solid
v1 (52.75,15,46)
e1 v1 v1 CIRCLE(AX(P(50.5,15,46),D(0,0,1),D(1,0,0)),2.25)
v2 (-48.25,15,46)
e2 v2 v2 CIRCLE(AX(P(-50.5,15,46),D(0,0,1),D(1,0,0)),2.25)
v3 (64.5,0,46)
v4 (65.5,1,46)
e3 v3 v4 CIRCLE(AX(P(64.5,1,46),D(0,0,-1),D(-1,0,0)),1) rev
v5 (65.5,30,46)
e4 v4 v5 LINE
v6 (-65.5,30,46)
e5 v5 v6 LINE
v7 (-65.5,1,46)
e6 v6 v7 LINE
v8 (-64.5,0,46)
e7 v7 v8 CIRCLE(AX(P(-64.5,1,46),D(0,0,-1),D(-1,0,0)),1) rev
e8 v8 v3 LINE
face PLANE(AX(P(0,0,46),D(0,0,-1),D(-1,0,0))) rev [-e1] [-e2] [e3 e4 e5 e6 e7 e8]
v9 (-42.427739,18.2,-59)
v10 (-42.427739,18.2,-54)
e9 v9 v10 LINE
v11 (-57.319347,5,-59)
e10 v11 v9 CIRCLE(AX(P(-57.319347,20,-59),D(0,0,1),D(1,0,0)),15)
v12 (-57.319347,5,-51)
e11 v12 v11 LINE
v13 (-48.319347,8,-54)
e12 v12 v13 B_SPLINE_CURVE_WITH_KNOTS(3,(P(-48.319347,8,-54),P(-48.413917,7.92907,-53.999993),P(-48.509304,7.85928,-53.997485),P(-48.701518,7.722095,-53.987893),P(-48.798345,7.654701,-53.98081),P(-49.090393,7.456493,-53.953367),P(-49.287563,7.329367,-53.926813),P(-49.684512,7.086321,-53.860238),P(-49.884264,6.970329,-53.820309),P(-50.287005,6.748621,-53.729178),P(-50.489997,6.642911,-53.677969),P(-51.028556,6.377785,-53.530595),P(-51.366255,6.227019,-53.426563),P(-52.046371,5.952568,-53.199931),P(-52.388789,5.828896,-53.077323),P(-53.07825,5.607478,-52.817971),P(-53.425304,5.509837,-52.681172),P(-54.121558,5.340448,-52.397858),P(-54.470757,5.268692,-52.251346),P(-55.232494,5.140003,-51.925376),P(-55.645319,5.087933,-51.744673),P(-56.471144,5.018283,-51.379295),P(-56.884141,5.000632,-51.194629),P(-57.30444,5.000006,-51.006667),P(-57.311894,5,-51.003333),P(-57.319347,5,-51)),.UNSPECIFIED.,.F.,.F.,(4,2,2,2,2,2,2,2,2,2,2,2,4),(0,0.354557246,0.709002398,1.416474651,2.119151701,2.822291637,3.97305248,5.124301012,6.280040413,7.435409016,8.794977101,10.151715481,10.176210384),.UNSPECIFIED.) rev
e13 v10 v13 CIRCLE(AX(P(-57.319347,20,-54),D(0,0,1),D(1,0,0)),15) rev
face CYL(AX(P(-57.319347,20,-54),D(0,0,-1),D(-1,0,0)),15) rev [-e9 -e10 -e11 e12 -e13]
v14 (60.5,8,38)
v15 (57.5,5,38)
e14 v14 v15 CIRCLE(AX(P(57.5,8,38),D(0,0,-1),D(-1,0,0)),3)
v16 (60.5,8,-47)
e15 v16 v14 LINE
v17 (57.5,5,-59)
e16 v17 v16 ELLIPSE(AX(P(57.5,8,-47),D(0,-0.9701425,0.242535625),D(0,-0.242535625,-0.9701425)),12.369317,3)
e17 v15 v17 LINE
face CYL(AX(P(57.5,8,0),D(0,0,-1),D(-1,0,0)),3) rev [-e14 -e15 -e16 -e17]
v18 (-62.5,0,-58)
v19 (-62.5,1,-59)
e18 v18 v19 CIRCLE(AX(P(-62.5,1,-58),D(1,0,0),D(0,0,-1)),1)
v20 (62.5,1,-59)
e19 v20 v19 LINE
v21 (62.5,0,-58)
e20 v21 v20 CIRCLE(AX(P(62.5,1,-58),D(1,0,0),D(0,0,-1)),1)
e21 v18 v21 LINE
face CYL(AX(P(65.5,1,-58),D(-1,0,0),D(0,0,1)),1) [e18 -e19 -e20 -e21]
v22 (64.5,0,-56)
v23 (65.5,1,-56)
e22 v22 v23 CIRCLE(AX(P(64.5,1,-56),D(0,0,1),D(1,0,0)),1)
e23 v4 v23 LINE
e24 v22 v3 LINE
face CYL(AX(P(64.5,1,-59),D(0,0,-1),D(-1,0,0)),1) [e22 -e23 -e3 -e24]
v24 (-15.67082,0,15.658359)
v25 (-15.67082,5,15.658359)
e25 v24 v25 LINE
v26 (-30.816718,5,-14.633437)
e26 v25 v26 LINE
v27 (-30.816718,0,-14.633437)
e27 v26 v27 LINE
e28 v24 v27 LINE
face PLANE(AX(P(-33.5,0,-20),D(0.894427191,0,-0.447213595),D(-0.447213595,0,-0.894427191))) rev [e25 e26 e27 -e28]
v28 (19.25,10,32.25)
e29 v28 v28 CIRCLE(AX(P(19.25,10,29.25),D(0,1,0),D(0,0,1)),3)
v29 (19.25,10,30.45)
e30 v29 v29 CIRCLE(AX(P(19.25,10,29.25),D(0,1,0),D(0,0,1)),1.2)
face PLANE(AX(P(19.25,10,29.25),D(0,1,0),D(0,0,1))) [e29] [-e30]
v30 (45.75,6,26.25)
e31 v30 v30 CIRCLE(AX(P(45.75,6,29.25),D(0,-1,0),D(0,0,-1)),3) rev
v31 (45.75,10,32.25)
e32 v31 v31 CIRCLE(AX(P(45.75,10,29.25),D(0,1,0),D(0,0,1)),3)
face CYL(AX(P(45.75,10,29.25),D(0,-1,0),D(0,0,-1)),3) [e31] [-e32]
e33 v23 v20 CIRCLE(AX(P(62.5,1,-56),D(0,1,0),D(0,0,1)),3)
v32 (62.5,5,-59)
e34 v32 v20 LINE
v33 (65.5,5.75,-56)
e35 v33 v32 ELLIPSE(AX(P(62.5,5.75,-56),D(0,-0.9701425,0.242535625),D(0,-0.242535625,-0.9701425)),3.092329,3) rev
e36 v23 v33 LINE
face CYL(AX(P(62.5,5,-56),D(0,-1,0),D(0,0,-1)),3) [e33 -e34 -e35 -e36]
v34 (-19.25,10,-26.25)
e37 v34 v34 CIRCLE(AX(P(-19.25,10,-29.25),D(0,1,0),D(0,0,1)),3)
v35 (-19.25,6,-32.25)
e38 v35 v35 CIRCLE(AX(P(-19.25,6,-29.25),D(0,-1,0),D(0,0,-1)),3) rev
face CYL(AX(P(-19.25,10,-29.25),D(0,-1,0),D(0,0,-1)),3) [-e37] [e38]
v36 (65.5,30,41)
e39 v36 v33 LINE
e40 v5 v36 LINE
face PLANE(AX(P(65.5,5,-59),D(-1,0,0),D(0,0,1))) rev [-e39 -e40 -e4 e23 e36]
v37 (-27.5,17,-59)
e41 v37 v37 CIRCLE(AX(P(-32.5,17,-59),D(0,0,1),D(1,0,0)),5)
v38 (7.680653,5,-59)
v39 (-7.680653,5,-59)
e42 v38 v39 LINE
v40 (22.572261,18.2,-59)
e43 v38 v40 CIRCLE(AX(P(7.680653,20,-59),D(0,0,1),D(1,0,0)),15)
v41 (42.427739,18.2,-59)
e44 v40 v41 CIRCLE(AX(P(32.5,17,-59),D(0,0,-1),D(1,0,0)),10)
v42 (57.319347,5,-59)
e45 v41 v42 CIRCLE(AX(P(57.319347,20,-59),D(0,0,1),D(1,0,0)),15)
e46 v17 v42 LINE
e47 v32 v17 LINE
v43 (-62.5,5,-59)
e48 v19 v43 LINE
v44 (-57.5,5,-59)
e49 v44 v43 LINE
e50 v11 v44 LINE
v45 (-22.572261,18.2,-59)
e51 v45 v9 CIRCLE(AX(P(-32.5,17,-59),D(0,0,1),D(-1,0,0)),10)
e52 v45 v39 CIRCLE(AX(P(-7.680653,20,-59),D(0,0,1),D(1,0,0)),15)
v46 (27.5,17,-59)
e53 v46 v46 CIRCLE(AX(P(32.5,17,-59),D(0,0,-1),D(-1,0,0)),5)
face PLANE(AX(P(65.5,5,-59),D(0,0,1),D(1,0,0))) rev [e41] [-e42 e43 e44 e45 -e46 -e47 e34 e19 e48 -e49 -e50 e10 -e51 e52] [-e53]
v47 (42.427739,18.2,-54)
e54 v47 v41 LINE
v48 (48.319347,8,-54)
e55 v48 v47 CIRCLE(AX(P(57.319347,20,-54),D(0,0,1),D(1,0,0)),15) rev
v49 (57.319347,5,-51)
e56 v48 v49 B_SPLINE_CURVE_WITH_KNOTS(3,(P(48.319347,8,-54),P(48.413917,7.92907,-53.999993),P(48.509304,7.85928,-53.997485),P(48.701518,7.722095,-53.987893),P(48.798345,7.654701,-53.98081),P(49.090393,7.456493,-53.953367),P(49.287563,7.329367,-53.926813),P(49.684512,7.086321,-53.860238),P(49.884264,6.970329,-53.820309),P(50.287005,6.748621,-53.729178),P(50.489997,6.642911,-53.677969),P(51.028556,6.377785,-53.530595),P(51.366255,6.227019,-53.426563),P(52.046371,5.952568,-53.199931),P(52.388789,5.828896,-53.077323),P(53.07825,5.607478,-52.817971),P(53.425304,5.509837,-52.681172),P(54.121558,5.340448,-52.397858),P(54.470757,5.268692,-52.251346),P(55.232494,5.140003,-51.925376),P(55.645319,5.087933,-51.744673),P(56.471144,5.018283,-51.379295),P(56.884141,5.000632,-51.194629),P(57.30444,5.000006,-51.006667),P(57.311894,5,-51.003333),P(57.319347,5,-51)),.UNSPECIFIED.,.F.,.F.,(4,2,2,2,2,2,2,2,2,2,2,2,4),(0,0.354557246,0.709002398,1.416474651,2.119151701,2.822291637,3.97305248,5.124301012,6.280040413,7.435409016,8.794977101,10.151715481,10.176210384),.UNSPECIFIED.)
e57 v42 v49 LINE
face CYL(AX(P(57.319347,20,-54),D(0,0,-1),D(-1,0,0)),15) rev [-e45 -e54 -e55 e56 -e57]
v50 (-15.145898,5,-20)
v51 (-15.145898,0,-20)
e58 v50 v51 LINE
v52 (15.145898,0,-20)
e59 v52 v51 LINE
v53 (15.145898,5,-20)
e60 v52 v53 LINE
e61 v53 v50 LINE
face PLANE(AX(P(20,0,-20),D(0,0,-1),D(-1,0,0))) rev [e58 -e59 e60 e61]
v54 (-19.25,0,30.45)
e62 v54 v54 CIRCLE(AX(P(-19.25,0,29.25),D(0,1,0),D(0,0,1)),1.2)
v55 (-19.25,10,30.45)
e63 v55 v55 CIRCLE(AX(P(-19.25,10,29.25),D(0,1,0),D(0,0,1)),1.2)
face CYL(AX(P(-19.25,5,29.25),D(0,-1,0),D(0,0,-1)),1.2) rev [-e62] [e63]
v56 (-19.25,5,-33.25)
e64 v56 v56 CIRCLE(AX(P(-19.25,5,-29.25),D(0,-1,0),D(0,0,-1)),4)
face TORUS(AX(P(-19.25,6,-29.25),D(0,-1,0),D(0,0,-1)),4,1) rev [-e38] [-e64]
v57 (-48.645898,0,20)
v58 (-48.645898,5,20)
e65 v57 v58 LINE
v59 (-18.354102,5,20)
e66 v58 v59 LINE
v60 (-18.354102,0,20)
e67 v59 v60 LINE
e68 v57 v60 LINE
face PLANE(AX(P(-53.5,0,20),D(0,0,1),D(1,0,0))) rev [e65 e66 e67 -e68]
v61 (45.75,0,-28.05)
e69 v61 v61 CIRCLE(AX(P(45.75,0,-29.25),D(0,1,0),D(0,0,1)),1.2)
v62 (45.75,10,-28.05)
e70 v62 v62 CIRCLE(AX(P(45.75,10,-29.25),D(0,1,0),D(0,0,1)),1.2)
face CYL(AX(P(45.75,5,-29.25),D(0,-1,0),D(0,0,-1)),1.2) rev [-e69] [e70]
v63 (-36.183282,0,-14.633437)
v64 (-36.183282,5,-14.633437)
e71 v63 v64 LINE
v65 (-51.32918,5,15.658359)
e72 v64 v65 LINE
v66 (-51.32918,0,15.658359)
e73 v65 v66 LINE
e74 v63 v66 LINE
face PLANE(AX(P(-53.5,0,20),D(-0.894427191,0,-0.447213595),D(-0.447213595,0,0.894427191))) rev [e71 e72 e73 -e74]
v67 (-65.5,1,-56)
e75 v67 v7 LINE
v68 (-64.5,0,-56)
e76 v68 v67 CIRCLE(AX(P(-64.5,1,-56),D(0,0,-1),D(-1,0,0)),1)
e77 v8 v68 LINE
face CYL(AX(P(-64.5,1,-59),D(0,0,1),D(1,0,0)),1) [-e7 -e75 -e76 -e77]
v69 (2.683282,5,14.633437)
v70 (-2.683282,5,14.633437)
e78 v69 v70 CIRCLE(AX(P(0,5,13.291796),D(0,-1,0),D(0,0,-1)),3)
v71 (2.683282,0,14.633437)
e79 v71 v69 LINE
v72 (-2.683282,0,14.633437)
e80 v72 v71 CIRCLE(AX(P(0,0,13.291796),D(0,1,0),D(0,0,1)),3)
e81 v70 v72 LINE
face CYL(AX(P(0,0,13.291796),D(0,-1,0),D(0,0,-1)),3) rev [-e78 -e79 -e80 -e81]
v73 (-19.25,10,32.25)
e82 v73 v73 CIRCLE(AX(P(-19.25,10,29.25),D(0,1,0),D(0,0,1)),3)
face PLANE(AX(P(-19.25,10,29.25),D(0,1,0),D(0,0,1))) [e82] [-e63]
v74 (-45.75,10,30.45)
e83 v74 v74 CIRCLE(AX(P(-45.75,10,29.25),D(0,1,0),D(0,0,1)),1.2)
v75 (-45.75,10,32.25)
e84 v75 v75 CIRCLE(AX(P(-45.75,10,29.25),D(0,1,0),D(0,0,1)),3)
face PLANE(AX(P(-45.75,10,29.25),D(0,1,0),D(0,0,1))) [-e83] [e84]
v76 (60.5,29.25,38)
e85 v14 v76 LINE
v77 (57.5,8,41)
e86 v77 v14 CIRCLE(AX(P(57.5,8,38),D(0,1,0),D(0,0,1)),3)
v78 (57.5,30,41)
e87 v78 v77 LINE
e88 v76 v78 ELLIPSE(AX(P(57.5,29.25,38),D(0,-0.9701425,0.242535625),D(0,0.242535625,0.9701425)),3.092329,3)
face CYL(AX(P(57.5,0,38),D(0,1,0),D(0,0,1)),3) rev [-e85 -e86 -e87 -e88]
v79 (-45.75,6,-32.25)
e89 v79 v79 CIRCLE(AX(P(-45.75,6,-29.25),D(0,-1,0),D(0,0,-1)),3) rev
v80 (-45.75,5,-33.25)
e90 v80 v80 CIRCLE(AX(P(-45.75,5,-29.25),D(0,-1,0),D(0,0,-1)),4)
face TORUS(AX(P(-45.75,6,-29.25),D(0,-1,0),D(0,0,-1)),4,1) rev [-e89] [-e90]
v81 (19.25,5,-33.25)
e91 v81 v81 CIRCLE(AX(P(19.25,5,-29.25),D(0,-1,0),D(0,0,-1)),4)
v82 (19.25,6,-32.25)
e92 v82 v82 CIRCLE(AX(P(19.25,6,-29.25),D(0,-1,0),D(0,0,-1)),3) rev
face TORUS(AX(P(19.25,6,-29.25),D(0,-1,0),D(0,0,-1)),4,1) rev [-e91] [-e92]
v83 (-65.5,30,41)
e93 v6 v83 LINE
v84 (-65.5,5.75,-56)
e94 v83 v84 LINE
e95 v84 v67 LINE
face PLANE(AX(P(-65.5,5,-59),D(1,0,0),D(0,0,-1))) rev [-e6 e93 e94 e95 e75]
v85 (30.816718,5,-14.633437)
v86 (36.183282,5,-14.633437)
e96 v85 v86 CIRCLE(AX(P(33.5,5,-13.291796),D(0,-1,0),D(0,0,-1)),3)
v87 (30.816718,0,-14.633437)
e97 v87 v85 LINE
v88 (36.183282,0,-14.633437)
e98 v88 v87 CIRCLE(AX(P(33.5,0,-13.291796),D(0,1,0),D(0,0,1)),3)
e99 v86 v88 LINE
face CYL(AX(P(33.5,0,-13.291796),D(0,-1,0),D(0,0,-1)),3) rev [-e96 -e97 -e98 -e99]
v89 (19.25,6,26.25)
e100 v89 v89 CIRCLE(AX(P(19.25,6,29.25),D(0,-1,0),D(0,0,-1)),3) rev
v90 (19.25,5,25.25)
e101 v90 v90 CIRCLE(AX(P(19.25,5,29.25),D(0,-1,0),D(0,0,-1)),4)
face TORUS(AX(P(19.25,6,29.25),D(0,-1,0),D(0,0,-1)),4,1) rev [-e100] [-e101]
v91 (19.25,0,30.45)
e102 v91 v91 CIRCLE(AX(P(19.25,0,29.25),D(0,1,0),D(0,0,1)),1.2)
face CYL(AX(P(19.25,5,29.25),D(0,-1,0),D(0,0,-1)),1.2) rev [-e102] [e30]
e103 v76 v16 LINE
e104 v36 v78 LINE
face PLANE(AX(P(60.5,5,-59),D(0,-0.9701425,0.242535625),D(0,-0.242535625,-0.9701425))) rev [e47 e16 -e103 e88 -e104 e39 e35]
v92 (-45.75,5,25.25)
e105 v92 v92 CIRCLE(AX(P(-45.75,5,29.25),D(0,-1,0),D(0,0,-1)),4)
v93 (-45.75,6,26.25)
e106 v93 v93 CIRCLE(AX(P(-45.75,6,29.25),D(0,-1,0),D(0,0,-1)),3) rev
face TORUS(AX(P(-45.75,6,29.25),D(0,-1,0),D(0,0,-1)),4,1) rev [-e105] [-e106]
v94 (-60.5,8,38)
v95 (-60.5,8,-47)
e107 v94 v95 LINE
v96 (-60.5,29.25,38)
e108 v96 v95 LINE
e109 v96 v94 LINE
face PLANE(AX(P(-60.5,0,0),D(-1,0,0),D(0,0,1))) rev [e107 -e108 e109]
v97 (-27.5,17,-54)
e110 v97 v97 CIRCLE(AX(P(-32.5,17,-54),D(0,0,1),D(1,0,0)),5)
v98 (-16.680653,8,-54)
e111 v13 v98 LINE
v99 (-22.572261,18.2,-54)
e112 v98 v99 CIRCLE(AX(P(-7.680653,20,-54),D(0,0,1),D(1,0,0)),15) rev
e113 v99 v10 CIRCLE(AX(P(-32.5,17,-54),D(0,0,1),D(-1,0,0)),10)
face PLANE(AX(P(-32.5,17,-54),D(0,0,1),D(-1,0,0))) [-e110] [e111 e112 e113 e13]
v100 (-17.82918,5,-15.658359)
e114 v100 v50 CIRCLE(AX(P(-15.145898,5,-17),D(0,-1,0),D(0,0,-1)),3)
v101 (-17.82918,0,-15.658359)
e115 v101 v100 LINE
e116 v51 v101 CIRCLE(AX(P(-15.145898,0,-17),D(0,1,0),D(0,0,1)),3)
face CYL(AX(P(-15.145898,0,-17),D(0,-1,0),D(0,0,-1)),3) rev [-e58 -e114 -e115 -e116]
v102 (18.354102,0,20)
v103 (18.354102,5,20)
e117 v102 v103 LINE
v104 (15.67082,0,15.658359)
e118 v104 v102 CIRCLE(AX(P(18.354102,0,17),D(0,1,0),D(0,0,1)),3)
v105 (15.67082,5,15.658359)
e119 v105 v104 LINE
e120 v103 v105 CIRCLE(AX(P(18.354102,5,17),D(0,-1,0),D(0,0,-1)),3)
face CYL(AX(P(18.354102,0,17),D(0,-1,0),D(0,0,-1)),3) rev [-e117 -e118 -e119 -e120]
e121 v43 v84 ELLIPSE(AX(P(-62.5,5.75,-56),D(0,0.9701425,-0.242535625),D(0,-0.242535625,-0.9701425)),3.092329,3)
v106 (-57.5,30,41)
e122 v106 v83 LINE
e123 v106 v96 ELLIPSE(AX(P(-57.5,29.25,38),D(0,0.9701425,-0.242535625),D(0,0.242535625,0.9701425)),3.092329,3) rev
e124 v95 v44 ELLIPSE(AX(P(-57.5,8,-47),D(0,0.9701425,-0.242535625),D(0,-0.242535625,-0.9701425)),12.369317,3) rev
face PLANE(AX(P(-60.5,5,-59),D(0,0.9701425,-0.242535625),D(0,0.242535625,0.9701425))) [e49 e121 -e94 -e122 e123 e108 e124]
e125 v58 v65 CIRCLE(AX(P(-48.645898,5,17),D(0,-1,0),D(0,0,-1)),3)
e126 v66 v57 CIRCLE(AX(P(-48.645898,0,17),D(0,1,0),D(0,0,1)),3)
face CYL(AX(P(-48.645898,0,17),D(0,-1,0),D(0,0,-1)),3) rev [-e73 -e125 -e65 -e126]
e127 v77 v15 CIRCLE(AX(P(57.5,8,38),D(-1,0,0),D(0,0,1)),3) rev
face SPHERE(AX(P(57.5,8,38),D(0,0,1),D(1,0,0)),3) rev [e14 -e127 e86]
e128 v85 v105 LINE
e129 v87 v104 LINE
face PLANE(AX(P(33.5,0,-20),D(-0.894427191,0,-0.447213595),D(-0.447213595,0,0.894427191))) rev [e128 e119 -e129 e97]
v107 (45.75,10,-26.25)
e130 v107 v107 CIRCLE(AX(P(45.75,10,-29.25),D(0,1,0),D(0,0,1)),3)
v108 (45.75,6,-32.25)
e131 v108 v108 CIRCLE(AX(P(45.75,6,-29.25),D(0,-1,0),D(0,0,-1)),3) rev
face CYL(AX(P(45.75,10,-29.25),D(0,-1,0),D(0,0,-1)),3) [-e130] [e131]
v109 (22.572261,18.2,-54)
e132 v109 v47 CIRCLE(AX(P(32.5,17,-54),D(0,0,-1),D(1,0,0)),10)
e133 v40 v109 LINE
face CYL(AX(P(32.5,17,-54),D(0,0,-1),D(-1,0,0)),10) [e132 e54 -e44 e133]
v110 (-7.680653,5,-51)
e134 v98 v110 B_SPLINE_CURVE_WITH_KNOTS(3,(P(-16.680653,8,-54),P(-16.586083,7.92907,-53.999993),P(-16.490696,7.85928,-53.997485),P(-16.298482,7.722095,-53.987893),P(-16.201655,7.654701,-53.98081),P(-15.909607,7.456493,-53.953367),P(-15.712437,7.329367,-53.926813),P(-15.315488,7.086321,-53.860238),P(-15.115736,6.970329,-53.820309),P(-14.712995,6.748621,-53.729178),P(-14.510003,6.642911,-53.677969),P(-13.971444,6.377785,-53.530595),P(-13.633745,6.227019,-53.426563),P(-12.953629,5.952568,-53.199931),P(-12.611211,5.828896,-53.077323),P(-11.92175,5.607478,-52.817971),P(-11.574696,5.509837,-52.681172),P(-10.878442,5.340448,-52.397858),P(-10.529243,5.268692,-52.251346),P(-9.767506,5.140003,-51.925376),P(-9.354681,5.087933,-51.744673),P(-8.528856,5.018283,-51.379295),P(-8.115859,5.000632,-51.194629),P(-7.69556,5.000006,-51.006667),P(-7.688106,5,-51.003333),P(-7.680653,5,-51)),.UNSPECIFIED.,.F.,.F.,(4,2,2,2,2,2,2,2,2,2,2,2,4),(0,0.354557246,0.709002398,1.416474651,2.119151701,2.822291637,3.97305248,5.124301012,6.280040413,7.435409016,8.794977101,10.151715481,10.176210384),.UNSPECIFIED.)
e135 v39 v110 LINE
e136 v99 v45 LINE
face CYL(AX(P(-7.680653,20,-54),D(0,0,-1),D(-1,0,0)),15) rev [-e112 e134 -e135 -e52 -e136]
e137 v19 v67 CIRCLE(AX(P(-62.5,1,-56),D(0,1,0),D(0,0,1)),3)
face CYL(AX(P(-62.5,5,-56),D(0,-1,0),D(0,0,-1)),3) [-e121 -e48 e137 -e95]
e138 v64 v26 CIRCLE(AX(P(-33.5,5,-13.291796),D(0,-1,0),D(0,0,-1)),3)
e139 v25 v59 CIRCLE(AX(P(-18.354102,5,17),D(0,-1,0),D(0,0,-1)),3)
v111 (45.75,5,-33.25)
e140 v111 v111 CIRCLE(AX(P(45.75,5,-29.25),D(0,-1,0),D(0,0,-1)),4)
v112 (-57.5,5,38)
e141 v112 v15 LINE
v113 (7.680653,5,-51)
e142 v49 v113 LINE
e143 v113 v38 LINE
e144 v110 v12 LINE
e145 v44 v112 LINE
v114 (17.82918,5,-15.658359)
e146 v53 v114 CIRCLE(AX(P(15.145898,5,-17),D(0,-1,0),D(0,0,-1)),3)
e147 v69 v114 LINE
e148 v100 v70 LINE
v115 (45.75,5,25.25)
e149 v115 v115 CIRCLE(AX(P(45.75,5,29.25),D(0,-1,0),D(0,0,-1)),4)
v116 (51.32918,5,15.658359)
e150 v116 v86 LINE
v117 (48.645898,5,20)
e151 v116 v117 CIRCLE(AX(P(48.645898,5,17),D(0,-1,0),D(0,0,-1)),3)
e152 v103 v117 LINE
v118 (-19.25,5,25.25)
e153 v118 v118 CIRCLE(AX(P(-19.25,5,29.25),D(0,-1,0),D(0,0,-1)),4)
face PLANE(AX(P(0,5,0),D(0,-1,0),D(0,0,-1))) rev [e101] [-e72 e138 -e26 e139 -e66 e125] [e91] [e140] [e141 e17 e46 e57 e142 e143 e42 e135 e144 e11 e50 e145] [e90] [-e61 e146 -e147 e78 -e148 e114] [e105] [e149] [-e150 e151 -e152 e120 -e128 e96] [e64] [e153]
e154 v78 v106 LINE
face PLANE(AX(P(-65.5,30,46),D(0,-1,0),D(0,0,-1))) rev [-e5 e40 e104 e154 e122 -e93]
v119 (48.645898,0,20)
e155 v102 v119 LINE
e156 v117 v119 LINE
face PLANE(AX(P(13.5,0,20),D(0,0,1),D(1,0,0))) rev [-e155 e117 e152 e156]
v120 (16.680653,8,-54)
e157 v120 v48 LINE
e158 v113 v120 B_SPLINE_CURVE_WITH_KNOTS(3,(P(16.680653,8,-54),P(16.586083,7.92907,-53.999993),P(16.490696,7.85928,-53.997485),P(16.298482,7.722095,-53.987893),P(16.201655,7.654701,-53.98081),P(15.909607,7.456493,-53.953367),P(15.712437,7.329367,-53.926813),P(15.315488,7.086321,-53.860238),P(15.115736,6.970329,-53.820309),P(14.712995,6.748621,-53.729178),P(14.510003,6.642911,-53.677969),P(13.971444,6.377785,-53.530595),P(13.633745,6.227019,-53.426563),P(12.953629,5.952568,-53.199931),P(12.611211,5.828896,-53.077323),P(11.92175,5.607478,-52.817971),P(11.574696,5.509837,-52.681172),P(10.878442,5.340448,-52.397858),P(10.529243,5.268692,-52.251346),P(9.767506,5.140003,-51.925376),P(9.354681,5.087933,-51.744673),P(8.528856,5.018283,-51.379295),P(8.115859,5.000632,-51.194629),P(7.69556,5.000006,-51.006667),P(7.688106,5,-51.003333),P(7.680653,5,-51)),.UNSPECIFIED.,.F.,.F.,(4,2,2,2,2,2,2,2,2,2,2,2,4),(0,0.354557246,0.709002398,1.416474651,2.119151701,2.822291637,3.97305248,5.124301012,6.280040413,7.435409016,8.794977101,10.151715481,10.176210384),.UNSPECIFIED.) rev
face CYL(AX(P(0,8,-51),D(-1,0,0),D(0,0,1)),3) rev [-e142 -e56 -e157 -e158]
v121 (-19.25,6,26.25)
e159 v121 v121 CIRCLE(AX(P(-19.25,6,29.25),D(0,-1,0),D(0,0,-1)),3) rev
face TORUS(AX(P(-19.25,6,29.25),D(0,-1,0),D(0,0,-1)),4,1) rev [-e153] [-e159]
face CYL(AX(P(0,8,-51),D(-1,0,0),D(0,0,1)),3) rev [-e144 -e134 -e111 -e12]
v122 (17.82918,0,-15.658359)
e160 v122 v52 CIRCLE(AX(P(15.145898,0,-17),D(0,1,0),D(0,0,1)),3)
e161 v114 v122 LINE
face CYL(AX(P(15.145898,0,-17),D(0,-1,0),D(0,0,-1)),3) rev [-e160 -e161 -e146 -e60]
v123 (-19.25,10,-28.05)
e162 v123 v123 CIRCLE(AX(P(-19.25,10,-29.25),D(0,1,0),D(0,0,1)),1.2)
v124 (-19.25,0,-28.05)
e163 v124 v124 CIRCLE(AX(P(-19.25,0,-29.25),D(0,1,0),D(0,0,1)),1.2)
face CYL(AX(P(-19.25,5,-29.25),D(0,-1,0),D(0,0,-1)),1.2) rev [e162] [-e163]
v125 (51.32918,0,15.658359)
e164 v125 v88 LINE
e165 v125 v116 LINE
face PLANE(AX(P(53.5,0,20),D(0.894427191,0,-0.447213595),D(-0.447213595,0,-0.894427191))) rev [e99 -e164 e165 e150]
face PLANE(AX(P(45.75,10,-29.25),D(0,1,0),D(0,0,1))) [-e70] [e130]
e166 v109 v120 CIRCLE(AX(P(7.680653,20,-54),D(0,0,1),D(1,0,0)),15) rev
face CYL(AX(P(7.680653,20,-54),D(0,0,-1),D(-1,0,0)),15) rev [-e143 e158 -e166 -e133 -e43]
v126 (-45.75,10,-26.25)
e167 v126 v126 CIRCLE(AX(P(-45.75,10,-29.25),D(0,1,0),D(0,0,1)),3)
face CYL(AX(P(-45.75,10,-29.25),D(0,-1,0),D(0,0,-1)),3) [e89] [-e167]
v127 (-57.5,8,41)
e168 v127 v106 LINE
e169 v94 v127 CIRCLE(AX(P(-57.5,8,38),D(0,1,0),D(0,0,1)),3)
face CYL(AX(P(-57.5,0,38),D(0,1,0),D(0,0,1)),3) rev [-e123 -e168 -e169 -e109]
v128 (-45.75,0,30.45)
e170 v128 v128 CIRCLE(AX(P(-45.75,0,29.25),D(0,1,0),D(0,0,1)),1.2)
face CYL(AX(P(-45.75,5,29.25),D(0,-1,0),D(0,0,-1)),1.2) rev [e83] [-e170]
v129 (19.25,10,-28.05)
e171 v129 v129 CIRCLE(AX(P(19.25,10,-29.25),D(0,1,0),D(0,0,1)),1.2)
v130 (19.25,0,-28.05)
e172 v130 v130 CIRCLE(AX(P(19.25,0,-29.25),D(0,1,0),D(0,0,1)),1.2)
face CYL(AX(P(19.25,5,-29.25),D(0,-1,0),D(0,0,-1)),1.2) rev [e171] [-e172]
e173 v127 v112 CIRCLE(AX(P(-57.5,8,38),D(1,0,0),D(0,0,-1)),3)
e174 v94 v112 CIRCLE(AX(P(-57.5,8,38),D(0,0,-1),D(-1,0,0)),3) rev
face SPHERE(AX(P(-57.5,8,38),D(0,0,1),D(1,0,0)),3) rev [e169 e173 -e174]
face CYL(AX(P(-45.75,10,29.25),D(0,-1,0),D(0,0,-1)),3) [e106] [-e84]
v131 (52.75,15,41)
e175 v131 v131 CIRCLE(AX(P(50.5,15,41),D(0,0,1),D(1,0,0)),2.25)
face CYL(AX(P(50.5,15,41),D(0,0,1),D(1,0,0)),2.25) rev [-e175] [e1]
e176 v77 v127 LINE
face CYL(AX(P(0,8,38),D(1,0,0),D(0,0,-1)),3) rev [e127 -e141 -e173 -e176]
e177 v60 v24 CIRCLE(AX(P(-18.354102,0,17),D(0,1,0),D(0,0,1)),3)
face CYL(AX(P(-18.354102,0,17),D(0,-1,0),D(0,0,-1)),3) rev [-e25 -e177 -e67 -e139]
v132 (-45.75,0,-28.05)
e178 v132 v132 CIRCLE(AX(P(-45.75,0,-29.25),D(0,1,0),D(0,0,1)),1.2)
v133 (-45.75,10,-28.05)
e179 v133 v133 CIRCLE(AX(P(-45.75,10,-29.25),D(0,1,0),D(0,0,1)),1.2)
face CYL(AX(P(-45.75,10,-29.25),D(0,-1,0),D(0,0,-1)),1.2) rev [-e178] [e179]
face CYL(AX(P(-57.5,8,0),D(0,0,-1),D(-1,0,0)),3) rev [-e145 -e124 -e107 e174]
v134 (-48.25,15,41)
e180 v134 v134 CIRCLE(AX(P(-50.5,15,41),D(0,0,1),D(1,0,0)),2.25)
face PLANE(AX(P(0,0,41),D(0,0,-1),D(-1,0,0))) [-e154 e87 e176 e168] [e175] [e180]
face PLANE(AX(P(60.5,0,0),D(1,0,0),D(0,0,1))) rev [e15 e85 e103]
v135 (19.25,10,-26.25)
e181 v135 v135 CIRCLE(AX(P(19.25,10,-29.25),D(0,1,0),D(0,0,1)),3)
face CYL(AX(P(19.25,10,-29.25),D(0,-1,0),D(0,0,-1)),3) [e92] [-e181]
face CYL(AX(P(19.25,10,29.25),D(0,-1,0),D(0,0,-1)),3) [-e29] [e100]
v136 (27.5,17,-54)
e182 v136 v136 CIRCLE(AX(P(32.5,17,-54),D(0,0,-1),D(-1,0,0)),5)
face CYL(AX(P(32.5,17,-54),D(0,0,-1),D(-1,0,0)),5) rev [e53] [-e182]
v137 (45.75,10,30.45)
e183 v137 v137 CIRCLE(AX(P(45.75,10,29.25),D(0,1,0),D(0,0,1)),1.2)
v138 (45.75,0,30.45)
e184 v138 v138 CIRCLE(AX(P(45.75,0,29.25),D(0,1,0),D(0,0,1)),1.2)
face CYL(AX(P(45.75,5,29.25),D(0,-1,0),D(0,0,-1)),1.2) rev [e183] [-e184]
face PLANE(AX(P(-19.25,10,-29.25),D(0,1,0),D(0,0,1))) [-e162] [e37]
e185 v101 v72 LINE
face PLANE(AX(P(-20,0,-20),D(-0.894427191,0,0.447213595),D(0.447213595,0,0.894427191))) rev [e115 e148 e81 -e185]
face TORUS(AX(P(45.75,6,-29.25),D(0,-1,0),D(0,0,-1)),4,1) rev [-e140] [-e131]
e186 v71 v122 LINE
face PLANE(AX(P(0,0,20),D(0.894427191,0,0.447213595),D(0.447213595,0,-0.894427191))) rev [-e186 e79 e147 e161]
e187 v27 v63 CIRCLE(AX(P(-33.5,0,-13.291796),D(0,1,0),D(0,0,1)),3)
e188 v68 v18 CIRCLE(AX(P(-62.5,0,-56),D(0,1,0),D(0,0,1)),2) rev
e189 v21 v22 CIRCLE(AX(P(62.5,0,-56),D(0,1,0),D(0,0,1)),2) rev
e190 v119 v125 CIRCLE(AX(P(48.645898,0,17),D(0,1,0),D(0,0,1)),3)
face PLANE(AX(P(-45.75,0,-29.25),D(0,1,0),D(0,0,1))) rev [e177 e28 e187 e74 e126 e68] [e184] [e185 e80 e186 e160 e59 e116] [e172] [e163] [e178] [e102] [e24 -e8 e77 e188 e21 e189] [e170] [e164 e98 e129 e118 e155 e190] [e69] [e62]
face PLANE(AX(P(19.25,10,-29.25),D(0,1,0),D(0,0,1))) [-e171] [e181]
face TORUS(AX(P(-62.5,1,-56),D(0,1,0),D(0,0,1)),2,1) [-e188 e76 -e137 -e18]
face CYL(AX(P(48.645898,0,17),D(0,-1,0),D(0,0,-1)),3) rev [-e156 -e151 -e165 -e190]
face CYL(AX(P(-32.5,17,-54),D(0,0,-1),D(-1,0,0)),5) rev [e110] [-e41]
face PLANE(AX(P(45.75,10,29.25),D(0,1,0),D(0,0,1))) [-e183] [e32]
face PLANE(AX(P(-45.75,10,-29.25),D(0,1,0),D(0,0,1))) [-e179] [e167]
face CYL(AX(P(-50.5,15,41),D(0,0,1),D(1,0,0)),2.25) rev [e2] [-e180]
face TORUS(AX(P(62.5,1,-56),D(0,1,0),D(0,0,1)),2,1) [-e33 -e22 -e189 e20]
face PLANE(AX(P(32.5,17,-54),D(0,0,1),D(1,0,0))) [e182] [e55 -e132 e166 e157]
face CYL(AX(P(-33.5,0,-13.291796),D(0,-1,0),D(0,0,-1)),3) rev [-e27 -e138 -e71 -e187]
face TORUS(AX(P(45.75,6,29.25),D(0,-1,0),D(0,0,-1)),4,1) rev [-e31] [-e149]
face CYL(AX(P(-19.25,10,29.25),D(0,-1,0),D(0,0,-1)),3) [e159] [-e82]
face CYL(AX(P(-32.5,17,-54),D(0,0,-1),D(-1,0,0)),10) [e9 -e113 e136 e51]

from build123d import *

# Parameters (mm, degrees)
SKETCH1_R             = 3
SKETCH1_R_2           = 1.2
BOSS_EXTRUDE1_DEPTH   = 10
BOSS_EXTRUDE1_2_DEPTH = 10
BOSS_EXTRUDE1_3_DEPTH = 10
BOSS_EXTRUDE1_4_DEPTH = 10
BOSS_EXTRUDE1_5_DEPTH = 10
BOSS_EXTRUDE1_6_DEPTH = 10
BOSS_EXTRUDE1_7_DEPTH = 10
BOSS_EXTRUDE1_8_DEPTH = 10
SKETCH2_W             = 131
SKETCH2_H             = 100
SKETCH2_R             = 1.2
BOSS_EXTRUDE2_DEPTH   = 5
SKETCH5_W             = 131
SKETCH5_H             = 30
BOSS_EXTRUDE4_DEPTH   = 5
BOSS_EXTRUDE5_DEPTH   = 5
FILLET2_R             = 3
SKETCH7_R             = 2.25
CUT_EXTRUDE2_DEPTH    = 5
SKETCH8_R             = 5
BOSS_EXTRUDE6_DEPTH   = 5
FILLET5_R             = 15
FILLET6_R             = 3
FILLET5_OF_MIRROR2_R  = 15
FILLET6_OF_MIRROR2_R  = 3
FILLET7_R             = 1
FILLET8_R             = 1
CUT_EXTRUDE3_DEPTH    = 5
FILLET9_R             = 3


with BuildPart() as part:
    # Sketch1 → Boss-Extrude1 (new body)
    with BuildSketch(Plane(origin=(0, 0, 0), x_dir=(1, 0, 0), z_dir=(0, 1, 0))):
        with Locations(Location((-45.75, 29.25, 0), (0, 0, 270))):
            Circle(SKETCH1_R)
        with Locations(Location((-45.75, 29.25, 0), (0, 0, 270))):
            Circle(SKETCH1_R_2, mode=Mode.SUBTRACT)
    extrude(amount=BOSS_EXTRUDE1_DEPTH)



with BuildPart() as body_2:
    # Sketch1 → Boss-Extrude1 2 (new body)
    with BuildSketch(Plane(origin=(0, 0, 0), x_dir=(1, 0, 0), z_dir=(0, 1, 0))):
        with Locations(Location((-19.25, 29.25, 0), (0, 0, 270))):
            Circle(SKETCH1_R)
        with Locations(Location((-19.25, 29.25, 0), (0, 0, 270))):
            Circle(SKETCH1_R_2, mode=Mode.SUBTRACT)
    extrude(amount=BOSS_EXTRUDE1_2_DEPTH)


with BuildPart() as body_3:
    # Sketch1 → Boss-Extrude1 3 (new body)
    with BuildSketch(Plane(origin=(0, 0, 0), x_dir=(1, 0, 0), z_dir=(0, 1, 0))):
        with Locations(Location((-45.75, -29.25, 0), (0, 0, 270))):
            Circle(SKETCH1_R)
        with Locations(Location((-45.75, -29.25, 0), (0, 0, 270))):
            Circle(SKETCH1_R_2, mode=Mode.SUBTRACT)
    extrude(amount=BOSS_EXTRUDE1_3_DEPTH)


with BuildPart() as body_4:
    # Sketch1 → Boss-Extrude1 4 (new body)
    with BuildSketch(Plane(origin=(0, 0, 0), x_dir=(1, 0, 0), z_dir=(0, 1, 0))):
        with Locations(Location((-19.25, -29.25, 0), (0, 0, 270))):
            Circle(SKETCH1_R)
        with Locations(Location((-19.25, -29.25, 0), (0, 0, 270))):
            Circle(SKETCH1_R_2, mode=Mode.SUBTRACT)
    extrude(amount=BOSS_EXTRUDE1_4_DEPTH)


with BuildPart() as body_5:
    # Sketch1 → Boss-Extrude1 5 (new body)
    with BuildSketch(Plane(origin=(0, 0, 0), x_dir=(1, 0, 0), z_dir=(0, 1, 0))):
        with Locations(Location((19.25, 29.25, 0), (0, 0, 270))):
            Circle(SKETCH1_R)
        with Locations(Location((19.25, 29.25, 0), (0, 0, 270))):
            Circle(SKETCH1_R_2, mode=Mode.SUBTRACT)
    extrude(amount=BOSS_EXTRUDE1_5_DEPTH)


with BuildPart() as body_6:
    # Sketch1 → Boss-Extrude1 6 (new body)
    with BuildSketch(Plane(origin=(0, 0, 0), x_dir=(1, 0, 0), z_dir=(0, 1, 0))):
        with Locations(Location((45.75, 29.25, 0), (0, 0, 270))):
            Circle(SKETCH1_R)
        with Locations(Location((45.75, 29.25, 0), (0, 0, 270))):
            Circle(SKETCH1_R_2, mode=Mode.SUBTRACT)
    extrude(amount=BOSS_EXTRUDE1_6_DEPTH)


with BuildPart() as body_7:
    # Sketch1 → Boss-Extrude1 7 (new body)
    with BuildSketch(Plane(origin=(0, 0, 0), x_dir=(1, 0, 0), z_dir=(0, 1, 0))):
        with Locations(Location((45.75, -29.25, 0), (0, 0, 270))):
            Circle(SKETCH1_R)
        with Locations(Location((45.75, -29.25, 0), (0, 0, 270))):
            Circle(SKETCH1_R_2, mode=Mode.SUBTRACT)
    extrude(amount=BOSS_EXTRUDE1_7_DEPTH)


with BuildPart() as body_8:
    # Sketch1 → Boss-Extrude1 8 (new body)
    with BuildSketch(Plane(origin=(0, 0, 0), x_dir=(1, 0, 0), z_dir=(0, 1, 0))):
        with Locations(Location((19.25, -29.25, 0), (0, 0, 270))):
            Circle(SKETCH1_R)
        with Locations(Location((19.25, -29.25, 0), (0, 0, 270))):
            Circle(SKETCH1_R_2, mode=Mode.SUBTRACT)
    extrude(amount=BOSS_EXTRUDE1_8_DEPTH)


with BuildPart() as part_1:
    add(part.part)

    add(body_2.part)  # Boss-Extrude2 merges body 2

    add(body_3.part)  # Boss-Extrude2 merges body 3

    add(body_4.part)  # Boss-Extrude2 merges body 4

    add(body_5.part)  # Boss-Extrude2 merges body 5

    add(body_6.part)  # Boss-Extrude2 merges body 6

    add(body_7.part)  # Boss-Extrude2 merges body 7

    add(body_8.part)  # Boss-Extrude2 merges body 8
    # Sketch2 → Boss-Extrude2 (add)
    with BuildSketch(Plane(origin=(0, 0, 0), x_dir=(1, 0, 0), z_dir=(0, 1, 0))):
        with Locations((0, 9)):
            Rectangle(SKETCH2_W, SKETCH2_H)
        with Locations(Location((45.75, -29.25, 0), (0, 0, 270))):
            Circle(SKETCH2_R, mode=Mode.SUBTRACT)
        with Locations(Location((19.25, -29.25, 0), (0, 0, 270))):
            Circle(SKETCH2_R, mode=Mode.SUBTRACT)
        with Locations(Location((-19.25, -29.25, 0), (0, 0, 270))):
            Circle(SKETCH2_R, mode=Mode.SUBTRACT)
        with Locations(Location((-45.75, -29.25, 0), (0, 0, 270))):
            Circle(SKETCH2_R, mode=Mode.SUBTRACT)
        with Locations(Location((-45.75, 29.25, 0), (0, 0, 270))):
            Circle(SKETCH2_R, mode=Mode.SUBTRACT)
        with Locations(Location((-19.25, 29.25, 0), (0, 0, 270))):
            Circle(SKETCH2_R, mode=Mode.SUBTRACT)
        with Locations(Location((19.25, 29.25, 0), (0, 0, 270))):
            Circle(SKETCH2_R, mode=Mode.SUBTRACT)
        with Locations(Location((45.75, 29.25, 0), (0, 0, 270))):
            Circle(SKETCH2_R, mode=Mode.SUBTRACT)
    extrude(amount=BOSS_EXTRUDE2_DEPTH)

    # Sketch5 → Boss-Extrude4 (add)
    with BuildSketch(Plane.XY.offset(41)):
        with Locations((0, 15)):
            Rectangle(SKETCH5_W, SKETCH5_H)
    extrude(amount=BOSS_EXTRUDE4_DEPTH)

    # Sketch6 → Boss-Extrude5 (add)
    with BuildSketch(Plane.ZY.offset(65.5)):
        Polygon((-59, 5), (41, 30), (41, 5), align=None)
    boss_extrude5 = extrude(amount=-BOSS_EXTRUDE5_DEPTH)

    # Mirror1: Boss-Extrude5 across plane
    add(boss_extrude5.mirror(Plane(origin=(0, 0, 0), x_dir=(0, 0, 1), z_dir=(1, 0, 0))))

    # Fillet2
    fillet2_edges = [part_1.edges().sort_by_distance(p)[0] for p in [
        (60.5, 5, -9),
        (60.5, 17.5, 41),
        (-65.5, 2.5, -59),
        (65.5, 2.5, -59),
        (0, 5, 41),
        (-60.5, 5, -9),
        (-60.5, 17.5, 41),
    ]]
    fillet(fillet2_edges, radius=FILLET2_R)

    # Sketch7 → Cut-Extrude2 (cut)
    with BuildSketch(Plane.XY.offset(46)):
        with Locations((-50.5, 15)):
            Circle(SKETCH7_R)
        with Locations((50.5, 15)):
            Circle(SKETCH7_R)
    extrude(amount=-CUT_EXTRUDE2_DEPTH, mode=Mode.SUBTRACT)

    # Sketch8 → Boss-Extrude6 (add)
    with BuildSketch(Plane(origin=(0, 0, -59), x_dir=(-1, 0, 0), z_dir=(0, 0, -1))):
        with BuildLine():
            Line((-42.5, 17), (-42.5, 0))
            Line((-42.5, 0), (-22.5, 0))
            Line((-22.5, 0), (-22.5, 17))
            ThreePointArc((-22.5, 17), (-32.5, 27), (-42.5, 17))
        make_face()
        with Locations((-32.5, 17)):
            Circle(SKETCH8_R, mode=Mode.SUBTRACT)
    boss_extrude6 = extrude(amount=-BOSS_EXTRUDE6_DEPTH)

    # Fillet5
    # the kernel refuses this fillet: 15 mm, written as the material it adds along each edge
    with BuildSketch(Plane(origin=(22.5, 5, -59), x_dir=(-1, 0, 0), z_dir=(0, 0, 1)), Plane(origin=(42.5, 5, -54), x_dir=(1, 0, 0), z_dir=(0, 0, -1))) as fillet5_piece_1:
        with BuildLine():
            CenterArc((14.819347292, -15), FILLET5_R, 90, 83.107897421)
            Line((-0.072261083, -13.2), (-1.561421921, -13.02))
            ThreePointArc((-1.561421921, -13.02), (-1.5, -12), (-1.5, 0))
            Line((-1.5, 0), (0, 1.5))
            Line((0, 1.5), (14.819347292, 1.5))
            Line((14.819347292, 1.5), (14.819347292, 0))
        make_face()
    extrude(amount=5)

    # Fillet6
    fillet6_edges = [part_1.edges().sort_by_distance(p)[0] for p in [
        (32.5, 5, -54),
    ]]
    fillet(fillet6_edges, radius=FILLET6_R)

    # Mirror2: Boss-Extrude6 across plane
    add(boss_extrude6.mirror(Plane(origin=(0, 0, 0), x_dir=(0, 0, 1), z_dir=(1, 0, 0))))

    # Fillet5 of Mirror2
    # the kernel refuses this fillet: 15 mm, written as the material it adds along each edge
    with BuildSketch(Plane(origin=(-22.5, 5, -59), x_dir=(-0.005474242459339525, 0.9999850162224914, 0), z_dir=(0, 0, 1)), Plane(origin=(-42.5, 5, -54), x_dir=(0.0054742424593400615, 0.9999850162224914, 0), z_dir=(0, 0, -1))) as fillet5_of_mirror2_piece_1:
        with BuildLine():
            CenterArc((14.918650543, -14.901238879), FILLET5_OF_MIRROR2_R, 96.578450024, 83.107897421)
            Line((-0.0811247, -14.819125242), (-1.581102225, -14.810913878))
            Line((-1.581102225, -14.810913878), (-1.499977524, 0.008211364))
            Line((-1.499977524, 0.008211364), (0.008211364, 1.499977524))
            ThreePointArc((0.008211364, 1.499977524), (12.008031558, 1.434286615), (13.028352513, 1.490123888))
            Line((13.028352513, 1.490123888), (13.200197789, 0))
        make_face()
    extrude(amount=5)

    # Fillet6 of Mirror2
    fillet6_of_mirror2_edges = [part_1.edges().sort_by_distance(p)[0] for p in [
        (-32.5, 5, -54),
    ]]
    fillet(fillet6_of_mirror2_edges, radius=FILLET6_OF_MIRROR2_R)

    # Fillet7
    fillet7_edges = [part_1.edges().sort_by_distance(p)[0] for p in [
        (-19.25, 5, -32.25),
        (-45.75, 5, 26.25),
        (-19.25, 5, 26.25),
        (19.25, 5, -32.25),
        (45.75, 5, -32.25),
        (45.75, 5, 26.25),
        (19.25, 5, 26.25),
        (-45.75, 5, -32.25),
    ]]
    fillet(fillet7_edges, radius=FILLET7_R)

    # Fillet8
    fillet8_edges = [part_1.edges().sort_by_distance(p)[0] for p in [
        (0, 0, -59),
        (-65.5, 0, -5),
        (-64.621320344, 0, -58.121320344),
        (64.621320344, 0, -58.121320344),
        (65.5, 0, -5),
    ]]
    fillet(fillet8_edges, radius=FILLET8_R)

    # Sketch11 → Cut-Extrude3 (cut)
    with BuildSketch(Plane(origin=(0, 5, 0), x_dir=(1, 0, 0), z_dir=(0, 1, 0))):
        Polygon((-53.5, -20), (-33.5, 20), (-13.5, -20), align=None)
        Polygon((-20, 20), (0, -20), (20, 20), align=None)
        Polygon((33.5, 20), (13.5, -20), (53.5, -20), align=None)
    extrude(amount=-CUT_EXTRUDE3_DEPTH, mode=Mode.SUBTRACT)

    # Fillet9
    fillet9_edges = [part_1.edges().sort_by_distance(p)[0] for p in [
        (-20, 2.5, -20),
        (20, 2.5, -20),
        (0, 2.5, 20),
        (33.5, 2.5, -20),
        (53.5, 2.5, 20),
        (13.5, 2.5, 20),
        (-13.5, 2.5, 20),
        (-53.5, 2.5, 20),
        (-33.5, 2.5, -20),
    ]]
    fillet(fillet9_edges, radius=FILLET9_R)


solid = part_1.part
